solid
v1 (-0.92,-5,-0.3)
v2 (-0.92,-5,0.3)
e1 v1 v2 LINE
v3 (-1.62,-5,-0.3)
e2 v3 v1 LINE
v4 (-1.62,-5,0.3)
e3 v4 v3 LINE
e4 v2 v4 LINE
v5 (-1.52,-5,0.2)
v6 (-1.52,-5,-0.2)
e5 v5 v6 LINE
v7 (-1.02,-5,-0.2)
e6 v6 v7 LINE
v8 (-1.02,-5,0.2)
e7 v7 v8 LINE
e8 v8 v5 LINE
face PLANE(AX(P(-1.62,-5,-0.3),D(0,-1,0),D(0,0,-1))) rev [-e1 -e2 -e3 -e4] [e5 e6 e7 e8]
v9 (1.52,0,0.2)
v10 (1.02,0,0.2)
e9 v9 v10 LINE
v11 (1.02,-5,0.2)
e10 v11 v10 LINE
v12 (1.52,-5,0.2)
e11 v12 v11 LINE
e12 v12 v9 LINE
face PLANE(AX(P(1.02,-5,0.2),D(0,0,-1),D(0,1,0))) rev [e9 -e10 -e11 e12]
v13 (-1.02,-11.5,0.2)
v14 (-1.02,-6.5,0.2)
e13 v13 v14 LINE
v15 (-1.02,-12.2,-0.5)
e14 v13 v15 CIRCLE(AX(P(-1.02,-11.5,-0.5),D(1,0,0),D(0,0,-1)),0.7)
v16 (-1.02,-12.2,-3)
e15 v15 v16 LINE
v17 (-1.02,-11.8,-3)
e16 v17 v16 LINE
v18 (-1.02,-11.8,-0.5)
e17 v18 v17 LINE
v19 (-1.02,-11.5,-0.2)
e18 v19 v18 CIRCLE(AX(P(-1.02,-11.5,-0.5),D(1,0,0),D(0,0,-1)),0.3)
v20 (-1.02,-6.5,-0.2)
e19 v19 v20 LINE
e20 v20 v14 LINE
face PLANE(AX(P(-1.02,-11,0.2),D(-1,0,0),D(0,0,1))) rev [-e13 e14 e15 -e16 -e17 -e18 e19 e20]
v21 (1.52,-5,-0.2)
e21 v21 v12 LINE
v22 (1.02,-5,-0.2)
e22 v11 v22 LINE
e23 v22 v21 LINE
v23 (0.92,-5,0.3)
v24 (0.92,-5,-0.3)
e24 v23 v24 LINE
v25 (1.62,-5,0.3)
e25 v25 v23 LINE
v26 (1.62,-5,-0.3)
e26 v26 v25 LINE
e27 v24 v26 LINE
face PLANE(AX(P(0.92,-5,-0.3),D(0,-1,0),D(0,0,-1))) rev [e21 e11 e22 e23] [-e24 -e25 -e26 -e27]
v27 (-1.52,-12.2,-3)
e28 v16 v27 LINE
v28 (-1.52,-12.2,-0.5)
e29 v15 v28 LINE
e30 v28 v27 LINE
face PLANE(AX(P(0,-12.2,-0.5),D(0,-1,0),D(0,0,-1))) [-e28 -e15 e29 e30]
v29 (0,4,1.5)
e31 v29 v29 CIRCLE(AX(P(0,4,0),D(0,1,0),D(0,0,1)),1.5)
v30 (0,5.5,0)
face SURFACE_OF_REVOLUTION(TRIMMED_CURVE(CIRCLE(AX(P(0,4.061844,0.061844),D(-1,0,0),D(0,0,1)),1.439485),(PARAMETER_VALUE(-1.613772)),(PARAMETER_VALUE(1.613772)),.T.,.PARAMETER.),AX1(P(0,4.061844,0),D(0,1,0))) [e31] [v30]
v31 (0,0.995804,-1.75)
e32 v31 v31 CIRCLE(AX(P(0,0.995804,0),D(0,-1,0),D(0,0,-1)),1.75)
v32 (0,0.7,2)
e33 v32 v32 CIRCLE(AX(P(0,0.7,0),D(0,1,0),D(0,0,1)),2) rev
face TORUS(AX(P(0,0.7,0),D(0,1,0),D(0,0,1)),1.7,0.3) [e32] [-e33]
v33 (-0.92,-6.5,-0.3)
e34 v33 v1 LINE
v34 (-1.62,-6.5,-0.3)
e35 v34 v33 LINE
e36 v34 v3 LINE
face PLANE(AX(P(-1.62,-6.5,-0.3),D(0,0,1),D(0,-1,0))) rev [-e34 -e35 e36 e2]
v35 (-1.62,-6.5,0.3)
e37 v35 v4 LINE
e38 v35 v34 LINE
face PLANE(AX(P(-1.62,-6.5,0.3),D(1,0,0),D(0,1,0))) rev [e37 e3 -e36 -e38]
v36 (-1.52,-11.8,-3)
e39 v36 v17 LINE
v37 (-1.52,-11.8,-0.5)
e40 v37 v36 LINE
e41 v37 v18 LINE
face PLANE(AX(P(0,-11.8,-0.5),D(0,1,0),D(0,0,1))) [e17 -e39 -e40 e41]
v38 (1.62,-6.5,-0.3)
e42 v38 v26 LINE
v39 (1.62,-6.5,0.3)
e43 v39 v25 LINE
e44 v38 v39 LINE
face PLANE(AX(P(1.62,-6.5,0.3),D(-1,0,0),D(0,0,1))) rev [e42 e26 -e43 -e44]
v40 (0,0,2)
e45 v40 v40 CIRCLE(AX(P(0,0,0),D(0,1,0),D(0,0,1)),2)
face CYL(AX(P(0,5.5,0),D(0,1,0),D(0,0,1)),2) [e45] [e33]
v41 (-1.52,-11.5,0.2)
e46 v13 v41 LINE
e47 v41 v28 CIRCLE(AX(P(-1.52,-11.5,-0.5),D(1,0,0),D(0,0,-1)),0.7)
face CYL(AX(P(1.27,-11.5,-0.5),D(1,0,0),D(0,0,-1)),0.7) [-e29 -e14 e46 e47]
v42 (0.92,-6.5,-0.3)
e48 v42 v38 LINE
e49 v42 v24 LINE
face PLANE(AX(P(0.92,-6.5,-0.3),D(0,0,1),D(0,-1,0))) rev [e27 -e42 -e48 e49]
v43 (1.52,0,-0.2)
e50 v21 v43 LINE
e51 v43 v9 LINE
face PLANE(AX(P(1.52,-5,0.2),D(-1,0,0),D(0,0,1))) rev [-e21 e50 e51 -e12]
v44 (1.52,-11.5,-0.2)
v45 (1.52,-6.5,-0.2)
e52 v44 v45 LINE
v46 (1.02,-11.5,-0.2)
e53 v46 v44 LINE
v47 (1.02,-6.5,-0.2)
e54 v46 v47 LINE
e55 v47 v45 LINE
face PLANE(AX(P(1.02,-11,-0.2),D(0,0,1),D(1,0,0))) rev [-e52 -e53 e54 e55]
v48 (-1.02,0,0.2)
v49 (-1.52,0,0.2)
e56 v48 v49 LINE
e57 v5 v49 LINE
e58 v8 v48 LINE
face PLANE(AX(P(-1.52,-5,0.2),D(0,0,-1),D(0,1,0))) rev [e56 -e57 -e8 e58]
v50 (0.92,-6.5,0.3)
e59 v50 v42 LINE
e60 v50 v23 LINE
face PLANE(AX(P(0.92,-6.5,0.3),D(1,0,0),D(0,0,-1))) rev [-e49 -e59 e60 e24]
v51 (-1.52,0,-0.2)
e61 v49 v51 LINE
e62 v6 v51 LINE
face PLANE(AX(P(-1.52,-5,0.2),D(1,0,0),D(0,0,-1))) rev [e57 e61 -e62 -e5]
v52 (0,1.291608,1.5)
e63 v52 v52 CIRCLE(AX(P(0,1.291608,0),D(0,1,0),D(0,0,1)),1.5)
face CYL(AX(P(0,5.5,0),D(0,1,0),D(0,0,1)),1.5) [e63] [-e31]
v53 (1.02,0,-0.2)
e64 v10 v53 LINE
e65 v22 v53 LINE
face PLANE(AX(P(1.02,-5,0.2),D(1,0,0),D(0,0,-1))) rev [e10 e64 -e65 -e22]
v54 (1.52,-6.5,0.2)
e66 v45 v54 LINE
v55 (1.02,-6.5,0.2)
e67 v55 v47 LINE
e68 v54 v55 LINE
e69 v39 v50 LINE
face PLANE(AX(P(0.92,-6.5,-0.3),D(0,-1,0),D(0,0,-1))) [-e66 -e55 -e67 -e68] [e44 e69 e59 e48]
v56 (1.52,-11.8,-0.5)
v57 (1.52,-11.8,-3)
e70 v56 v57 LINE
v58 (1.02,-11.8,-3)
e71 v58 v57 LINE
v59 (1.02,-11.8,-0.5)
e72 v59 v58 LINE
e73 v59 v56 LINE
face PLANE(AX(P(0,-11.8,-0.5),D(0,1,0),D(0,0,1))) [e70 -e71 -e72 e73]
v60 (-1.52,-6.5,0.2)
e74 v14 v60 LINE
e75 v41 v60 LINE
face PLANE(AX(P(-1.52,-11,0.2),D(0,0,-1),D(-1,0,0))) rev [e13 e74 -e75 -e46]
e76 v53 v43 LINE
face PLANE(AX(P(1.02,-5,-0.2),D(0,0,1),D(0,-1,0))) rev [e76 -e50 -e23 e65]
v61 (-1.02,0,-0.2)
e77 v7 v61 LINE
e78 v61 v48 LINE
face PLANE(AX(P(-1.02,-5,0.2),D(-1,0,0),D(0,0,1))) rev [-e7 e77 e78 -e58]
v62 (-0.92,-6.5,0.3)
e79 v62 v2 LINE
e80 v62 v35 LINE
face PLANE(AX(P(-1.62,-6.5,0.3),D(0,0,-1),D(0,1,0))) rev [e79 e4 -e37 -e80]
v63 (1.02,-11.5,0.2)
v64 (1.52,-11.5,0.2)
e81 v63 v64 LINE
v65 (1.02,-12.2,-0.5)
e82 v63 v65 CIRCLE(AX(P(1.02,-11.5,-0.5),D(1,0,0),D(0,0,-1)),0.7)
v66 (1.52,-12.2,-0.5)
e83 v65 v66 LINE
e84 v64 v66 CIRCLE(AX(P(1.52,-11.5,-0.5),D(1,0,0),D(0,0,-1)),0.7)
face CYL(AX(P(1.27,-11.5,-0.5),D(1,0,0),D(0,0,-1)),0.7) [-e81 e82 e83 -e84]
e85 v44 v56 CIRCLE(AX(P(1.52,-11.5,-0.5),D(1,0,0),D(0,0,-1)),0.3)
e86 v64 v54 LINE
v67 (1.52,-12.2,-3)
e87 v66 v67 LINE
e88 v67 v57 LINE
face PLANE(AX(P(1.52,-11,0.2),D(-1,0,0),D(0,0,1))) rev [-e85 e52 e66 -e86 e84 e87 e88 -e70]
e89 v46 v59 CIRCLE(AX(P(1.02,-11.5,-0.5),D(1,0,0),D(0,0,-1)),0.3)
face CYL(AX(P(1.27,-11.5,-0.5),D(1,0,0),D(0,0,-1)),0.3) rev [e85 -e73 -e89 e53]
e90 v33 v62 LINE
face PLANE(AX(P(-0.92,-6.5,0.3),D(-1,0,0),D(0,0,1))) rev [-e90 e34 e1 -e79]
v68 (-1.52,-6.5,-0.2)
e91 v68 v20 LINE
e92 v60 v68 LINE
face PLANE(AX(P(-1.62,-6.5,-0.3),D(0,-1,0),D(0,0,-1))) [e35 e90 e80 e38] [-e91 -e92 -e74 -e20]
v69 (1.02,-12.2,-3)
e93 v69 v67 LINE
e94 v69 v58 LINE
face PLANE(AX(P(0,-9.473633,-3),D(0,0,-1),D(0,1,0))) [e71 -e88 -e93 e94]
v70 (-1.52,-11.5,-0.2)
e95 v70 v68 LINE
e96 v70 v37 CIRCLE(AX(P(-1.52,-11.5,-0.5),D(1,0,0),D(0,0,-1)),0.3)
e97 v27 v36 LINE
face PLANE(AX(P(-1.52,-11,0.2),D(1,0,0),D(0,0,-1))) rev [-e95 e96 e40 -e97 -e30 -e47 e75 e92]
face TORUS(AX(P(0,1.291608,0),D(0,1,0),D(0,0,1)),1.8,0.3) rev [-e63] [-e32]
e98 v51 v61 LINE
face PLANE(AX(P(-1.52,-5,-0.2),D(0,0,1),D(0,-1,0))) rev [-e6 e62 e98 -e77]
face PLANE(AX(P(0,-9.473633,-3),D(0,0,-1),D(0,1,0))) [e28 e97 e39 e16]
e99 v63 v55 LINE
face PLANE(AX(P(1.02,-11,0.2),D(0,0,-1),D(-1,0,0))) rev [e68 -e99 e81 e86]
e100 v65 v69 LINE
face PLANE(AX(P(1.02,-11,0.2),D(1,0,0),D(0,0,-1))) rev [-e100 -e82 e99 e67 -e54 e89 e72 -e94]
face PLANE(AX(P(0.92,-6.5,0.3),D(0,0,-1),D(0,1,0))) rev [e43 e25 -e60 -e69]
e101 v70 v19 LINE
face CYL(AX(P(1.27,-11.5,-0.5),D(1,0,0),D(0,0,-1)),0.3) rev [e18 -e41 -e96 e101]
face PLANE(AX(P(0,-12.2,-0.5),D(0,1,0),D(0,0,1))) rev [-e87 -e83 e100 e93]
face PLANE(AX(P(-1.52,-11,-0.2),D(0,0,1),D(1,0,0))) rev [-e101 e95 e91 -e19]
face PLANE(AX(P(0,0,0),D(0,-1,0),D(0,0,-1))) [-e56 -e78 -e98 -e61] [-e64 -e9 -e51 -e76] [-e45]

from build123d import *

# Parameters (mm, degrees)
FILLET_1_R      = 0.3
FILLET_2_R      = 0.3
SKETCH_2_W      = 0.5
SKETCH_2_H      = 0.4
EXTRUDE_1_DEPTH = 5
SKETCH_3_W      = 0.7
SKETCH_3_H      = 0.6
EXTRUDE_2_DEPTH = 1.5
SKETCH_5_W      = 0.5
SKETCH_5_H      = 0.4
EXTRUDE_3_DEPTH = 4.5
SWEEP_START     = -1.52
SWEEP_2_DEPTH   = 0.5
SKETCH_7_262_W  = 0.5
SKETCH_7_262_H  = 0.4


# Read off the part's stored shape, not the designer's step: По траектории2
with BuildPart() as part:
    # Эскиз1 → Повернуть2 (revolve)
    with BuildSketch(Plane(origin=(0, 0, 0), x_dir=(0, 0, -1), z_dir=(1, 0, 0))):
        with BuildLine():
            Line((0, 0), (-2, 0))
            Line((-2, 0), (-2, 1))
            Line((-2, 1), (-1.5, 1))
            Line((-1.5, 1), (-1.5, 4))
            ThreePointArc((-1.5, 4), (-1.07971355, 5.07971355), (0, 5.5))
            Line((0, 5.5), (0, 0))
        make_face()
    revolve(axis=Axis((0, 5.5, 0), (0, -1, 0)))

    # Скругление1
    fillet_1_edges = [part.edges().sort_by_distance(p)[0] for p in [
        (0, 1, -2),
    ]]
    fillet(fillet_1_edges, radius=FILLET_1_R)

    # Скругление2
    fillet_2_edges = [part.edges().sort_by_distance(p)[0] for p in [
        (0, 1, -1.5),
    ]]
    fillet(fillet_2_edges, radius=FILLET_2_R)

    # Эскиз2 → Вытянуть1 (add)
    with BuildSketch(Plane.XZ):
        with Locations((-1.27, 0)):
            Rectangle(SKETCH_2_W, SKETCH_2_H)
        with Locations((1.27, 0)):
            Rectangle(SKETCH_2_W, SKETCH_2_H)
    extrude(amount=EXTRUDE_1_DEPTH)

    # Эскиз3 → Вытянуть2 (add)
    with BuildSketch(Plane.XZ.offset(5)):
        with Locations((-1.27, 0)):
            Rectangle(SKETCH_3_W, SKETCH_3_H)
        with Locations((1.27, 0)):
            Rectangle(SKETCH_3_W, SKETCH_3_H)
    extrude(amount=EXTRUDE_2_DEPTH)

    # Эскиз5 → Вытянуть3 (add)
    with BuildSketch(Plane.XZ.offset(6.5)):
        with Locations((-1.27, 0)):
            Rectangle(SKETCH_5_W, SKETCH_5_H)
        with Locations((1.27, 0)):
            Rectangle(SKETCH_5_W, SKETCH_5_H)
    extrude(amount=EXTRUDE_3_DEPTH)

    # По траектории2 outline → По траектории2 (add)
    with BuildSketch(Plane.YZ.offset(SWEEP_START)):
        with BuildLine():
            Line((-11.5, -0.2), (-11, -0.2))
            Line((-11, -0.2), (-11, 0.2))
            Line((-11, 0.2), (-11.5, 0.2))
            ThreePointArc((-11.5, 0.2), (-11.994974747, -0.005025253), (-12.2, -0.5))
            Line((-12.2, -0.5), (-12.2, -3))
            Line((-12.2, -3), (-11.8, -3))
            Line((-11.8, -3), (-11.8, -0.5))
            ThreePointArc((-11.8, -0.5), (-11.712132034, -0.287867966), (-11.5, -0.2))
        make_face()
    extrude(amount=SWEEP_2_DEPTH)

    # По траектории11: sweep along a curve in space
    with BuildLine() as sweep_11_path:
        Line((-1.27, -11, 0), (-1.27, -11.5, 0))
        ThreePointArc((-1.27, -11.5, 0), (-1.27, -11.853553391, -0.146446609), (-1.27, -12, -0.5))
        Line((-1.27, -12, -0.5), (-1.27, -12, -3))
    # Эскиз7<262> → По траектории11 (sweep)
    with BuildSketch(Plane.XZ.offset(11)):
        with Locations((-1.27, 0)):
            Rectangle(SKETCH_7_262_W, SKETCH_7_262_H)
        with Locations((1.27, 0)):
            Rectangle(SKETCH_7_262_W, SKETCH_7_262_H)
    sweep(path=sweep_11_path.line)


solid = part.part
